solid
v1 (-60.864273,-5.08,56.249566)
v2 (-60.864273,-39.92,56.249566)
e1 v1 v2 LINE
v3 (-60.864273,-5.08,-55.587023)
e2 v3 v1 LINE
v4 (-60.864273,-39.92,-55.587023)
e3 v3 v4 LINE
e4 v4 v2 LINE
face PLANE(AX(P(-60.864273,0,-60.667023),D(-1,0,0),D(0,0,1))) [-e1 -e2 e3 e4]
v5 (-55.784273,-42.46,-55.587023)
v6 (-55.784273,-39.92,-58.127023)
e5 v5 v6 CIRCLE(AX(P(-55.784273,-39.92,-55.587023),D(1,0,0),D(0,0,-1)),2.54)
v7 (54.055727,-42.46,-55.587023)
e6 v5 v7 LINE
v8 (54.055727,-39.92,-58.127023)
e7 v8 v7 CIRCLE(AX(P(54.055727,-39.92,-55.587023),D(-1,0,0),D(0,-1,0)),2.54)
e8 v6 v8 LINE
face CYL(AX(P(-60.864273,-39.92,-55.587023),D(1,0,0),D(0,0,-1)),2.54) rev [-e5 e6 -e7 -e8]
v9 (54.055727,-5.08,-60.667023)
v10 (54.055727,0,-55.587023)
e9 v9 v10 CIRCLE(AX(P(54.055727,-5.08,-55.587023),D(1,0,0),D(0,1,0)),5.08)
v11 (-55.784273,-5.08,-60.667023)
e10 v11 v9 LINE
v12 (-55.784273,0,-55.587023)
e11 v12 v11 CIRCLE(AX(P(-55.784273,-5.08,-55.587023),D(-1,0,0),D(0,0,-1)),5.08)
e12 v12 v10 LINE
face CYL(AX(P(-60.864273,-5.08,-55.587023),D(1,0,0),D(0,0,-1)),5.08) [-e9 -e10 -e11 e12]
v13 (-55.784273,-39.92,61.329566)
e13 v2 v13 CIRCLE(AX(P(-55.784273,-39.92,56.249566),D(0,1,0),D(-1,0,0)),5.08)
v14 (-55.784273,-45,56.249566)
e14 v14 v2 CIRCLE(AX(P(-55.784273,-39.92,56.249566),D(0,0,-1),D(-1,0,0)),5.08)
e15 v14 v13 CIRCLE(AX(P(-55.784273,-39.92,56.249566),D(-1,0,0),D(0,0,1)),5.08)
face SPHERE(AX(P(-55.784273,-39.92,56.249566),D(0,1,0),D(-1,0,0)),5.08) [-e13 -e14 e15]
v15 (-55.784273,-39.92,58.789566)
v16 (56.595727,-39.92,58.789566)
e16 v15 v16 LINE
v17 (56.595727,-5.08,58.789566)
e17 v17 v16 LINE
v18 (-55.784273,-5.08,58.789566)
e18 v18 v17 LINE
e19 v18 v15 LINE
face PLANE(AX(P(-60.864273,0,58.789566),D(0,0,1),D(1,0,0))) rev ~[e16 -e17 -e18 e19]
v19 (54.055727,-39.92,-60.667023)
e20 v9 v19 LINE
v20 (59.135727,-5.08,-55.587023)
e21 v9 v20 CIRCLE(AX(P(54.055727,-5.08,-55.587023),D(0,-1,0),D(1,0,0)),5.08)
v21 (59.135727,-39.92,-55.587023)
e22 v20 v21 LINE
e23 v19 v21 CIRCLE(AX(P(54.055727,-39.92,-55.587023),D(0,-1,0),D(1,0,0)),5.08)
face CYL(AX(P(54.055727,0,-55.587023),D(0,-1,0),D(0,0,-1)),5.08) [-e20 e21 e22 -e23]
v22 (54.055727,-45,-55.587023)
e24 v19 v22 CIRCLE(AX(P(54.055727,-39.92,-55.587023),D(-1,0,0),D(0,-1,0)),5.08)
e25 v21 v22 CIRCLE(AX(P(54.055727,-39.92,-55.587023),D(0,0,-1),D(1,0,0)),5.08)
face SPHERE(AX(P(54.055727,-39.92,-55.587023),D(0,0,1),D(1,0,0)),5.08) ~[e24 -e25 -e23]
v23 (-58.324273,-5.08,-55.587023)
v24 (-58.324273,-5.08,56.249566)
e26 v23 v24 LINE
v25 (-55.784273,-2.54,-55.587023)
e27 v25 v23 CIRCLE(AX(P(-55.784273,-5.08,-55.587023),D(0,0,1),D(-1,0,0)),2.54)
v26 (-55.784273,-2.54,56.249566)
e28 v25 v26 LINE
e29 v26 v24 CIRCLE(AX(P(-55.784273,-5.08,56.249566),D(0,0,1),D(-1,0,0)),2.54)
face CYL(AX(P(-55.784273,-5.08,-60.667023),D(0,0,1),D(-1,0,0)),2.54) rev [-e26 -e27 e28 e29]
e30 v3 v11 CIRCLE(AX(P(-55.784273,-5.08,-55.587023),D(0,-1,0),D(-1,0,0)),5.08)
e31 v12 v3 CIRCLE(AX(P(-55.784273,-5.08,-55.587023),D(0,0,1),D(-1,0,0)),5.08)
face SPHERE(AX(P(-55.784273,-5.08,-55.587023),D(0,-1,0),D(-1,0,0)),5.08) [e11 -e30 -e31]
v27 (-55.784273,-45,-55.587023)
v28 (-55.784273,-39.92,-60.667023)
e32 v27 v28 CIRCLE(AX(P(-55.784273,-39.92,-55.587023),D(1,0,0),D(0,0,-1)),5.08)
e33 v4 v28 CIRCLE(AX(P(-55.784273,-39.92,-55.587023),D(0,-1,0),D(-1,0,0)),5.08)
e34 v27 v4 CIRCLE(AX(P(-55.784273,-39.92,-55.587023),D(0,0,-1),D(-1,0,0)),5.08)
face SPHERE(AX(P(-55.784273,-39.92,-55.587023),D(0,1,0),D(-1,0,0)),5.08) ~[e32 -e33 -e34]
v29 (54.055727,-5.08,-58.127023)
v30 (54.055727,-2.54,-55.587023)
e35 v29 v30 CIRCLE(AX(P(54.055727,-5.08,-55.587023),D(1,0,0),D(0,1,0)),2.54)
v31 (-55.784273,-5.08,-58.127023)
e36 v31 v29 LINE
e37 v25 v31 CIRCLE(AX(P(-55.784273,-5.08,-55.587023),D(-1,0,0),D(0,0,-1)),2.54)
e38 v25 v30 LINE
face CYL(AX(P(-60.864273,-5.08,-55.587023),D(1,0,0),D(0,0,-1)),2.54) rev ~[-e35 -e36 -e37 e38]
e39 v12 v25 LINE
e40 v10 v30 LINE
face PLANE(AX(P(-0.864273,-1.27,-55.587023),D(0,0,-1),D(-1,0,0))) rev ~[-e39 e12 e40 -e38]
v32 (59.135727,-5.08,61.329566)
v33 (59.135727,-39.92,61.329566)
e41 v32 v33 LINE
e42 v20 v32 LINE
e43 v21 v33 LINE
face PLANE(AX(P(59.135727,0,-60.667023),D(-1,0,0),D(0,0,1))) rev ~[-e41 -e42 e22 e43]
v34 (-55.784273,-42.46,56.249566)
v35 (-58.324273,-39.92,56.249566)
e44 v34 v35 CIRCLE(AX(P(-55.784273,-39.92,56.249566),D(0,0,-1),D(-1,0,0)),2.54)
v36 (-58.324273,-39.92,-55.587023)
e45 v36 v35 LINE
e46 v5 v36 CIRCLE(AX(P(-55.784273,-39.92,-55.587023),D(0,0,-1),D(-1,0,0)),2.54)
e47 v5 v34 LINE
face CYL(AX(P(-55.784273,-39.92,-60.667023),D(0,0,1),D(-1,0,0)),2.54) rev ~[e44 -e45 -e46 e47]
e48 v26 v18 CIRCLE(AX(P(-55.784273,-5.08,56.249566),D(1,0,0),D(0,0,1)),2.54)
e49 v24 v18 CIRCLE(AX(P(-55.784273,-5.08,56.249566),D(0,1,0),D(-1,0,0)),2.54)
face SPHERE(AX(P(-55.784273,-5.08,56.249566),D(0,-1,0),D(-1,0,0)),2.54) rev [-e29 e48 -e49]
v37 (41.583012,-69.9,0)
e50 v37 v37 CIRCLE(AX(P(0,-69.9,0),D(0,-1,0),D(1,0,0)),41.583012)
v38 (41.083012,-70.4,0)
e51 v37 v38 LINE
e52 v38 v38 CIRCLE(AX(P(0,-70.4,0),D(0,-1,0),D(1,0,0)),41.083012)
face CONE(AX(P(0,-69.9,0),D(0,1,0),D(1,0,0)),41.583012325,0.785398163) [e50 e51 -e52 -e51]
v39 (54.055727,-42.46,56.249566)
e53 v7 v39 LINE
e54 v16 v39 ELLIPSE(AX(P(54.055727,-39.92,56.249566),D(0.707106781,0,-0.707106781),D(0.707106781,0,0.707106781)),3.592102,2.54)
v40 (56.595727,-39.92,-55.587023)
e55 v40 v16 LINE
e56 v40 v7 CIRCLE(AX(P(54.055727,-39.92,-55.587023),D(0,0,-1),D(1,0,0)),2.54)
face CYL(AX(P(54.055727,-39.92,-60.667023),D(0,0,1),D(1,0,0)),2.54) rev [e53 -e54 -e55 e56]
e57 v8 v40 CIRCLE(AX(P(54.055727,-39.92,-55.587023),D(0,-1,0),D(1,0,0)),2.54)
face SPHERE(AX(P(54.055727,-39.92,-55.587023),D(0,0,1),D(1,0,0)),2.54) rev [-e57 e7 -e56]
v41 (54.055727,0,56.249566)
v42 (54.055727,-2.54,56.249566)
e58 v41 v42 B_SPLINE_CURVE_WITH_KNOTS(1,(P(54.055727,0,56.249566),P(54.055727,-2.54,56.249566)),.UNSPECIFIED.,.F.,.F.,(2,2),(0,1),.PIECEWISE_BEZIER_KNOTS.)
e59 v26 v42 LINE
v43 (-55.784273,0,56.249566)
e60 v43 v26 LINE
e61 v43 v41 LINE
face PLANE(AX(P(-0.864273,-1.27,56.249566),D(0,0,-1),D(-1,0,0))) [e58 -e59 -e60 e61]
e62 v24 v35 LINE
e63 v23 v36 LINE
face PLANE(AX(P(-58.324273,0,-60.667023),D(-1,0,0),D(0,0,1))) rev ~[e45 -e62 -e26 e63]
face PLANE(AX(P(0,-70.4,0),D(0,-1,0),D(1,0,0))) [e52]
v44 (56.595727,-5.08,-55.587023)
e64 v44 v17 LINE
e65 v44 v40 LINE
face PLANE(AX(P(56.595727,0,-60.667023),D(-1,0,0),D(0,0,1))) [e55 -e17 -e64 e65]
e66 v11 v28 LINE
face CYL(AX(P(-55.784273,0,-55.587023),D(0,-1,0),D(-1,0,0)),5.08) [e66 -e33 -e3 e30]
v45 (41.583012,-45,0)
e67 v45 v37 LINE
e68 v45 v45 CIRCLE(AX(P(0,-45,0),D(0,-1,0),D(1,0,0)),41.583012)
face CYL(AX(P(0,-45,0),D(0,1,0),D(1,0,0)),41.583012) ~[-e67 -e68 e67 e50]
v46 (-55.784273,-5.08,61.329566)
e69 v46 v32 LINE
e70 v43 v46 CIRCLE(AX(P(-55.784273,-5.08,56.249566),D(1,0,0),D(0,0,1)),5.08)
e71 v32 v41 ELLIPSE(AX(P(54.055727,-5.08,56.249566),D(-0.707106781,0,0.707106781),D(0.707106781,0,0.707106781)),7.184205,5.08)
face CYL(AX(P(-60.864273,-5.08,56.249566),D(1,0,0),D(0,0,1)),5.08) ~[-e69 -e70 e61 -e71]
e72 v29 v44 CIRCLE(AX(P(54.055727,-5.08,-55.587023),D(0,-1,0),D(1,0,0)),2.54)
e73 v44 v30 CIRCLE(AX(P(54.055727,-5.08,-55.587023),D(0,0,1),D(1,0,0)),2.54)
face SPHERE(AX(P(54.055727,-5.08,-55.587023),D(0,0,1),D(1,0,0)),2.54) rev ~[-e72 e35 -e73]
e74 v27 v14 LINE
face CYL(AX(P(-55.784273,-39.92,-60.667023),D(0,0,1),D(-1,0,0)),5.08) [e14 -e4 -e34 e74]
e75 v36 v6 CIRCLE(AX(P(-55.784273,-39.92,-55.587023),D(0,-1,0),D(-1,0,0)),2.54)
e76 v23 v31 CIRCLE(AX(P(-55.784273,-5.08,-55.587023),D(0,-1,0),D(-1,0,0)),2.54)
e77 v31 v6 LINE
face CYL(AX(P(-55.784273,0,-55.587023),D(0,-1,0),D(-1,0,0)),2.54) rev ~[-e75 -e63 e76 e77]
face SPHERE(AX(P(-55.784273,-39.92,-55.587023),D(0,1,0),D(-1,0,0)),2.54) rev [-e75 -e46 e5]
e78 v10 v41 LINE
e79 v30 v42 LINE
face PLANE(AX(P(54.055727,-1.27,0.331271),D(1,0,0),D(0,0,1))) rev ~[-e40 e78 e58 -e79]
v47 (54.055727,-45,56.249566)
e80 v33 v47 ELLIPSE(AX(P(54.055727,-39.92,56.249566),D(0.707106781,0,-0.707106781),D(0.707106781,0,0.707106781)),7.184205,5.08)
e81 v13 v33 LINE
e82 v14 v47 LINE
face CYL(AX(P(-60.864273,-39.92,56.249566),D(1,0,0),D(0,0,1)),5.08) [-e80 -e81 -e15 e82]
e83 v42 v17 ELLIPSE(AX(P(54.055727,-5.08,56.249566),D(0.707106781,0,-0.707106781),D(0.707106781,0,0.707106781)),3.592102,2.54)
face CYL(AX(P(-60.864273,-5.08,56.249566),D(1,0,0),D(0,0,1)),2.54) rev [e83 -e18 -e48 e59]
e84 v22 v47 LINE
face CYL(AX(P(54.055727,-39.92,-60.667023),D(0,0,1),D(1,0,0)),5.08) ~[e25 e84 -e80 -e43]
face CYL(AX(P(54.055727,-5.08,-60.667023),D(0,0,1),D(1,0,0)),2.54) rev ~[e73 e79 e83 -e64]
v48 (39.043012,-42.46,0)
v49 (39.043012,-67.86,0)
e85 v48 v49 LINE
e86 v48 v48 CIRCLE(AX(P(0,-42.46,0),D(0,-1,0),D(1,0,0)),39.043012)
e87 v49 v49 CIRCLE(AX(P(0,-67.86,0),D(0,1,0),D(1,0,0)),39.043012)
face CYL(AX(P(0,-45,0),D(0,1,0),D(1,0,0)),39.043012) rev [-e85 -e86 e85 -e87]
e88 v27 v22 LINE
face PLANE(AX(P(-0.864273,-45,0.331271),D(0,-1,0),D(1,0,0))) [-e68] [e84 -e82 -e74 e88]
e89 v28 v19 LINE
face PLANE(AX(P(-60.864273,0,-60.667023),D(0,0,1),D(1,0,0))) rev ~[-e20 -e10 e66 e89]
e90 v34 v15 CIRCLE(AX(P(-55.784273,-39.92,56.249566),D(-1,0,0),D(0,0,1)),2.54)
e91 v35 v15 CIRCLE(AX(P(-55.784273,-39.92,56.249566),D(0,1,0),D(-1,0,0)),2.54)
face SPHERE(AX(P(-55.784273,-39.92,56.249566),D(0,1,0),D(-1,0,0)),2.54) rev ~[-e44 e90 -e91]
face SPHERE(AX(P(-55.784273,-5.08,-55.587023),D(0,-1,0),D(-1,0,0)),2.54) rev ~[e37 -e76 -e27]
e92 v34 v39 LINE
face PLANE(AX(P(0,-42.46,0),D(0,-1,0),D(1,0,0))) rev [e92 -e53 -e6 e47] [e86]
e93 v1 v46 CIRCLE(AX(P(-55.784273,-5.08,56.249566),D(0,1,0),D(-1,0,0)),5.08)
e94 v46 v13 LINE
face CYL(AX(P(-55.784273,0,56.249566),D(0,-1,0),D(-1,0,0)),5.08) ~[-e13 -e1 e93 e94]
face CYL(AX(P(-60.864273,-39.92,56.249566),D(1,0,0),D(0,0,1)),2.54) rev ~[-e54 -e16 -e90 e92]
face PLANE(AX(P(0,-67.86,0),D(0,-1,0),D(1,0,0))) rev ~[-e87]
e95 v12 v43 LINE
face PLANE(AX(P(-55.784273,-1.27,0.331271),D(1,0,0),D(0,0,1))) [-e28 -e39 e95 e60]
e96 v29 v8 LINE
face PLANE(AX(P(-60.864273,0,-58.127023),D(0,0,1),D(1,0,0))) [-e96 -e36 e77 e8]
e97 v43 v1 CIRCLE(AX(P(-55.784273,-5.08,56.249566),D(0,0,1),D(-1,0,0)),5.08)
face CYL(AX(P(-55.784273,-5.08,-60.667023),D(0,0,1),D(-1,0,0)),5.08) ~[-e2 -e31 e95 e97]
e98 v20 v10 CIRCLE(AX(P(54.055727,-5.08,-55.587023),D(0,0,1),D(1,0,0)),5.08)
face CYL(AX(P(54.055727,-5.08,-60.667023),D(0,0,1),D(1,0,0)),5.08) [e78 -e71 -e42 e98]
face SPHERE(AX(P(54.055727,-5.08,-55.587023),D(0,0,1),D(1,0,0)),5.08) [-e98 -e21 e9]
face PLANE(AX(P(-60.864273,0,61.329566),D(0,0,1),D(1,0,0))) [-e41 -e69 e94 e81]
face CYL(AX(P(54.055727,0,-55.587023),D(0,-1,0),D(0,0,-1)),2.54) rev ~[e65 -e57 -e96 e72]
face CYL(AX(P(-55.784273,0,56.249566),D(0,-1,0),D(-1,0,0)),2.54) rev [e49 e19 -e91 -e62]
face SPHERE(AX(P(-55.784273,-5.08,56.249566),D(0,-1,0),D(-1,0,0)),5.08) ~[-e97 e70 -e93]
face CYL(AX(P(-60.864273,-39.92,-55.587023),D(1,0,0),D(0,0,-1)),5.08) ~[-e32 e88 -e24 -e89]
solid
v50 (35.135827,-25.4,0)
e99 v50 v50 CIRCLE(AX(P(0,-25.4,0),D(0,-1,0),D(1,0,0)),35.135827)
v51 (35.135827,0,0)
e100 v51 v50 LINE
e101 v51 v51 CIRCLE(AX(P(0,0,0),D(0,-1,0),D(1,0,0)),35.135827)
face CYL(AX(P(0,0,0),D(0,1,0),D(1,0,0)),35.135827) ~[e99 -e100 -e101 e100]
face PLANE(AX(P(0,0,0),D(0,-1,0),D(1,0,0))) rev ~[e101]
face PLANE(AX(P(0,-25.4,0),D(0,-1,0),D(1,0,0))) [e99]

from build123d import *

# Parameters (mm, degrees)
F0_W      = 120
F0_H      = 121.996589005
F1_DEPTH  = 45
F3_R      = 35.3699694231
F2_R      = 41.5830123254
F4_DEPTH  = 50.8
F5_R      = 5.08
F6_DEPTH  = 25.4
F7_DEPTH  = 25.4
F9_DEPTH  = 25.4
F10_SIZE  = 0.5
F11_T     = 2.54
F12_R     = 35.1358269191
F13_DEPTH = 25.4


# Not quite as in the source:
# - a shell that OpenCascade refuses in one call is made with other operations: the cavity is built on its own and cut out
# - the program builds the solid bodies; features that only make, move or delete a surface that nothing else refers to are left out


with BuildPart() as f1:
    # F0 (on Front) → F1 (new body)
    with BuildSketch(Plane.XZ):
        with Locations((-0.8642734587, 0.3312714398)):
            Rectangle(F0_W, F0_H)
    extrude(amount=F1_DEPTH)

    # F3 (on face) + F2 (on face) → F4 (cut)
    with BuildSketch(Plane.XZ.offset(45)):
        Circle(F3_R)
    with BuildSketch(Plane.XZ.offset(45)):
        Circle(F2_R)
    extrude(amount=F4_DEPTH, mode=Mode.SUBTRACT)

    # F5
    f5_edges = [f1.edges().sort_by_distance(p)[0] for p in [
        (-60.864273, -22.5, 61.329566),
        (-60.864273, -22.5, -60.667023),
        (-60.864273, 0, 0.331271),
        (-60.864273, -45, 0.331271),
        (-0.864273, -45, 61.329566),
        (-0.864273, 0, 61.329566),
        (59.135727, 0, 0.331271),
        (59.135727, -45, 0.331271),
        (59.135727, -22.5, -60.667023),
        (-0.864273, -45, -60.667023),
        (-0.864273, 0, -60.667023),
    ]]
    fillet(f5_edges, radius=F5_R)

    # F3 (on face) + F2 (on face) → F6 (join)
    with BuildSketch(Plane.XZ.offset(45)):
        Circle(F3_R)
    with BuildSketch(Plane.XZ.offset(45)):
        Circle(F2_R)
    extrude(amount=F6_DEPTH)

    # F3 (on face) → F7 (join)
    with BuildSketch(Plane.XZ.offset(45)):
        Circle(F3_R)
    extrude(amount=-F7_DEPTH)

    # F3 (on face) → F9 (join)
    with BuildSketch(Plane.XZ.offset(45)):
        Circle(F3_R)
    extrude(amount=-F9_DEPTH)

    # F10
    f10_edges = [f1.edges().sort_by_distance(p)[0] for p in [
        (-41.583012, -70.4, 0),
    ]]
    chamfer(f10_edges, length=F10_SIZE)

    # F11: shell of thickness 2.54, made by hand


with BuildPart() as f11_core1:
    # F11_t2: copy of F1
    add(f1.part)

    # the walls: a layer under each face that stays
    f11_faces = [f11_core1.faces().sort_by_distance(p)[0] for p in [
        (-41.5830123254, -57.45, 0),
        (-41.3330123254, -70.15, 0),
        (-37.4776067921, -45, -36.9475915619),
        (0, -70.4, 0),
        (-59.3763759071, -43.5121024484, 0.3312714398),
        (1.6757265413, -43.5121025775, 59.8416682617),
        (-0.8642734587, -43.5121024484, -59.1791255111),
        (57.6478288607, -43.5121025775, 2.8712714398),
        (-58.3242734587, -43.5121024484, 58.7895659423),
        (-60.8642734587, -22.5, 0.3312714398),
        (-58.3242734587, -43.5121024484, -58.1270230627),
        (1.6757265413, -22.5, 61.3295659423),
        (-0.8642734587, -22.5, -60.6670230627),
        (56.5957265413, -42.46, -59.1791255111),
        (59.1357265413, -22.5, 2.8712714398),
        (-59.3763759071, -22.5, 59.8416683907),
        (-59.3763759071, -1.4878975516, 0.3312714398),
        (-59.3763759071, -22.5, -59.1791255111),
        (1.6757265413, -1.4878975516, 59.8416683907),
        (-0.8642734587, -1.4878975516, -59.1791255111),
        (57.6478289897, -22.5, -59.1791255111),
        (57.6478289897, -1.4878975516, 2.8712714398),
        (-58.3242734587, -1.4878975516, 58.7895659423),
        (-58.3242734587, -1.4878975516, -58.1270230627),
        (56.5957265413, -2.54, -59.1791255111),
    ]]
    thicken(f11_faces, amount=-F11_T, mode=Mode.SUBTRACT)

    # F11_s3 → F11_t4 (revolve, cut)
    with BuildSketch(Plane.XY):
        Polygon((41.6084123254, -45.0254), (39.0430123254, -45), (39.0430123254, -42.46), (41.5830123254, -42.46), align=None)
    revolve(axis=Axis((0, -45, 0), (0, -1, 0)), mode=Mode.SUBTRACT)


with BuildPart() as f1_1:
    add(f1.part)

    # what is left inside the walls is the cavity
    f11_cavity = [f11_core1.part.solids().sort_by_distance(p)[0] for p in [
        (-0.864273, -0.0254, -18.30816),
    ]]
    add(f11_cavity, mode=Mode.SUBTRACT)


with BuildPart() as f13:
    # F12 (on Front) → F13 (new body)
    with BuildSketch(Plane.XZ):
        Circle(F12_R)
    extrude(amount=F13_DEPTH)


solid = Compound([f1_1.part, f13.part])
